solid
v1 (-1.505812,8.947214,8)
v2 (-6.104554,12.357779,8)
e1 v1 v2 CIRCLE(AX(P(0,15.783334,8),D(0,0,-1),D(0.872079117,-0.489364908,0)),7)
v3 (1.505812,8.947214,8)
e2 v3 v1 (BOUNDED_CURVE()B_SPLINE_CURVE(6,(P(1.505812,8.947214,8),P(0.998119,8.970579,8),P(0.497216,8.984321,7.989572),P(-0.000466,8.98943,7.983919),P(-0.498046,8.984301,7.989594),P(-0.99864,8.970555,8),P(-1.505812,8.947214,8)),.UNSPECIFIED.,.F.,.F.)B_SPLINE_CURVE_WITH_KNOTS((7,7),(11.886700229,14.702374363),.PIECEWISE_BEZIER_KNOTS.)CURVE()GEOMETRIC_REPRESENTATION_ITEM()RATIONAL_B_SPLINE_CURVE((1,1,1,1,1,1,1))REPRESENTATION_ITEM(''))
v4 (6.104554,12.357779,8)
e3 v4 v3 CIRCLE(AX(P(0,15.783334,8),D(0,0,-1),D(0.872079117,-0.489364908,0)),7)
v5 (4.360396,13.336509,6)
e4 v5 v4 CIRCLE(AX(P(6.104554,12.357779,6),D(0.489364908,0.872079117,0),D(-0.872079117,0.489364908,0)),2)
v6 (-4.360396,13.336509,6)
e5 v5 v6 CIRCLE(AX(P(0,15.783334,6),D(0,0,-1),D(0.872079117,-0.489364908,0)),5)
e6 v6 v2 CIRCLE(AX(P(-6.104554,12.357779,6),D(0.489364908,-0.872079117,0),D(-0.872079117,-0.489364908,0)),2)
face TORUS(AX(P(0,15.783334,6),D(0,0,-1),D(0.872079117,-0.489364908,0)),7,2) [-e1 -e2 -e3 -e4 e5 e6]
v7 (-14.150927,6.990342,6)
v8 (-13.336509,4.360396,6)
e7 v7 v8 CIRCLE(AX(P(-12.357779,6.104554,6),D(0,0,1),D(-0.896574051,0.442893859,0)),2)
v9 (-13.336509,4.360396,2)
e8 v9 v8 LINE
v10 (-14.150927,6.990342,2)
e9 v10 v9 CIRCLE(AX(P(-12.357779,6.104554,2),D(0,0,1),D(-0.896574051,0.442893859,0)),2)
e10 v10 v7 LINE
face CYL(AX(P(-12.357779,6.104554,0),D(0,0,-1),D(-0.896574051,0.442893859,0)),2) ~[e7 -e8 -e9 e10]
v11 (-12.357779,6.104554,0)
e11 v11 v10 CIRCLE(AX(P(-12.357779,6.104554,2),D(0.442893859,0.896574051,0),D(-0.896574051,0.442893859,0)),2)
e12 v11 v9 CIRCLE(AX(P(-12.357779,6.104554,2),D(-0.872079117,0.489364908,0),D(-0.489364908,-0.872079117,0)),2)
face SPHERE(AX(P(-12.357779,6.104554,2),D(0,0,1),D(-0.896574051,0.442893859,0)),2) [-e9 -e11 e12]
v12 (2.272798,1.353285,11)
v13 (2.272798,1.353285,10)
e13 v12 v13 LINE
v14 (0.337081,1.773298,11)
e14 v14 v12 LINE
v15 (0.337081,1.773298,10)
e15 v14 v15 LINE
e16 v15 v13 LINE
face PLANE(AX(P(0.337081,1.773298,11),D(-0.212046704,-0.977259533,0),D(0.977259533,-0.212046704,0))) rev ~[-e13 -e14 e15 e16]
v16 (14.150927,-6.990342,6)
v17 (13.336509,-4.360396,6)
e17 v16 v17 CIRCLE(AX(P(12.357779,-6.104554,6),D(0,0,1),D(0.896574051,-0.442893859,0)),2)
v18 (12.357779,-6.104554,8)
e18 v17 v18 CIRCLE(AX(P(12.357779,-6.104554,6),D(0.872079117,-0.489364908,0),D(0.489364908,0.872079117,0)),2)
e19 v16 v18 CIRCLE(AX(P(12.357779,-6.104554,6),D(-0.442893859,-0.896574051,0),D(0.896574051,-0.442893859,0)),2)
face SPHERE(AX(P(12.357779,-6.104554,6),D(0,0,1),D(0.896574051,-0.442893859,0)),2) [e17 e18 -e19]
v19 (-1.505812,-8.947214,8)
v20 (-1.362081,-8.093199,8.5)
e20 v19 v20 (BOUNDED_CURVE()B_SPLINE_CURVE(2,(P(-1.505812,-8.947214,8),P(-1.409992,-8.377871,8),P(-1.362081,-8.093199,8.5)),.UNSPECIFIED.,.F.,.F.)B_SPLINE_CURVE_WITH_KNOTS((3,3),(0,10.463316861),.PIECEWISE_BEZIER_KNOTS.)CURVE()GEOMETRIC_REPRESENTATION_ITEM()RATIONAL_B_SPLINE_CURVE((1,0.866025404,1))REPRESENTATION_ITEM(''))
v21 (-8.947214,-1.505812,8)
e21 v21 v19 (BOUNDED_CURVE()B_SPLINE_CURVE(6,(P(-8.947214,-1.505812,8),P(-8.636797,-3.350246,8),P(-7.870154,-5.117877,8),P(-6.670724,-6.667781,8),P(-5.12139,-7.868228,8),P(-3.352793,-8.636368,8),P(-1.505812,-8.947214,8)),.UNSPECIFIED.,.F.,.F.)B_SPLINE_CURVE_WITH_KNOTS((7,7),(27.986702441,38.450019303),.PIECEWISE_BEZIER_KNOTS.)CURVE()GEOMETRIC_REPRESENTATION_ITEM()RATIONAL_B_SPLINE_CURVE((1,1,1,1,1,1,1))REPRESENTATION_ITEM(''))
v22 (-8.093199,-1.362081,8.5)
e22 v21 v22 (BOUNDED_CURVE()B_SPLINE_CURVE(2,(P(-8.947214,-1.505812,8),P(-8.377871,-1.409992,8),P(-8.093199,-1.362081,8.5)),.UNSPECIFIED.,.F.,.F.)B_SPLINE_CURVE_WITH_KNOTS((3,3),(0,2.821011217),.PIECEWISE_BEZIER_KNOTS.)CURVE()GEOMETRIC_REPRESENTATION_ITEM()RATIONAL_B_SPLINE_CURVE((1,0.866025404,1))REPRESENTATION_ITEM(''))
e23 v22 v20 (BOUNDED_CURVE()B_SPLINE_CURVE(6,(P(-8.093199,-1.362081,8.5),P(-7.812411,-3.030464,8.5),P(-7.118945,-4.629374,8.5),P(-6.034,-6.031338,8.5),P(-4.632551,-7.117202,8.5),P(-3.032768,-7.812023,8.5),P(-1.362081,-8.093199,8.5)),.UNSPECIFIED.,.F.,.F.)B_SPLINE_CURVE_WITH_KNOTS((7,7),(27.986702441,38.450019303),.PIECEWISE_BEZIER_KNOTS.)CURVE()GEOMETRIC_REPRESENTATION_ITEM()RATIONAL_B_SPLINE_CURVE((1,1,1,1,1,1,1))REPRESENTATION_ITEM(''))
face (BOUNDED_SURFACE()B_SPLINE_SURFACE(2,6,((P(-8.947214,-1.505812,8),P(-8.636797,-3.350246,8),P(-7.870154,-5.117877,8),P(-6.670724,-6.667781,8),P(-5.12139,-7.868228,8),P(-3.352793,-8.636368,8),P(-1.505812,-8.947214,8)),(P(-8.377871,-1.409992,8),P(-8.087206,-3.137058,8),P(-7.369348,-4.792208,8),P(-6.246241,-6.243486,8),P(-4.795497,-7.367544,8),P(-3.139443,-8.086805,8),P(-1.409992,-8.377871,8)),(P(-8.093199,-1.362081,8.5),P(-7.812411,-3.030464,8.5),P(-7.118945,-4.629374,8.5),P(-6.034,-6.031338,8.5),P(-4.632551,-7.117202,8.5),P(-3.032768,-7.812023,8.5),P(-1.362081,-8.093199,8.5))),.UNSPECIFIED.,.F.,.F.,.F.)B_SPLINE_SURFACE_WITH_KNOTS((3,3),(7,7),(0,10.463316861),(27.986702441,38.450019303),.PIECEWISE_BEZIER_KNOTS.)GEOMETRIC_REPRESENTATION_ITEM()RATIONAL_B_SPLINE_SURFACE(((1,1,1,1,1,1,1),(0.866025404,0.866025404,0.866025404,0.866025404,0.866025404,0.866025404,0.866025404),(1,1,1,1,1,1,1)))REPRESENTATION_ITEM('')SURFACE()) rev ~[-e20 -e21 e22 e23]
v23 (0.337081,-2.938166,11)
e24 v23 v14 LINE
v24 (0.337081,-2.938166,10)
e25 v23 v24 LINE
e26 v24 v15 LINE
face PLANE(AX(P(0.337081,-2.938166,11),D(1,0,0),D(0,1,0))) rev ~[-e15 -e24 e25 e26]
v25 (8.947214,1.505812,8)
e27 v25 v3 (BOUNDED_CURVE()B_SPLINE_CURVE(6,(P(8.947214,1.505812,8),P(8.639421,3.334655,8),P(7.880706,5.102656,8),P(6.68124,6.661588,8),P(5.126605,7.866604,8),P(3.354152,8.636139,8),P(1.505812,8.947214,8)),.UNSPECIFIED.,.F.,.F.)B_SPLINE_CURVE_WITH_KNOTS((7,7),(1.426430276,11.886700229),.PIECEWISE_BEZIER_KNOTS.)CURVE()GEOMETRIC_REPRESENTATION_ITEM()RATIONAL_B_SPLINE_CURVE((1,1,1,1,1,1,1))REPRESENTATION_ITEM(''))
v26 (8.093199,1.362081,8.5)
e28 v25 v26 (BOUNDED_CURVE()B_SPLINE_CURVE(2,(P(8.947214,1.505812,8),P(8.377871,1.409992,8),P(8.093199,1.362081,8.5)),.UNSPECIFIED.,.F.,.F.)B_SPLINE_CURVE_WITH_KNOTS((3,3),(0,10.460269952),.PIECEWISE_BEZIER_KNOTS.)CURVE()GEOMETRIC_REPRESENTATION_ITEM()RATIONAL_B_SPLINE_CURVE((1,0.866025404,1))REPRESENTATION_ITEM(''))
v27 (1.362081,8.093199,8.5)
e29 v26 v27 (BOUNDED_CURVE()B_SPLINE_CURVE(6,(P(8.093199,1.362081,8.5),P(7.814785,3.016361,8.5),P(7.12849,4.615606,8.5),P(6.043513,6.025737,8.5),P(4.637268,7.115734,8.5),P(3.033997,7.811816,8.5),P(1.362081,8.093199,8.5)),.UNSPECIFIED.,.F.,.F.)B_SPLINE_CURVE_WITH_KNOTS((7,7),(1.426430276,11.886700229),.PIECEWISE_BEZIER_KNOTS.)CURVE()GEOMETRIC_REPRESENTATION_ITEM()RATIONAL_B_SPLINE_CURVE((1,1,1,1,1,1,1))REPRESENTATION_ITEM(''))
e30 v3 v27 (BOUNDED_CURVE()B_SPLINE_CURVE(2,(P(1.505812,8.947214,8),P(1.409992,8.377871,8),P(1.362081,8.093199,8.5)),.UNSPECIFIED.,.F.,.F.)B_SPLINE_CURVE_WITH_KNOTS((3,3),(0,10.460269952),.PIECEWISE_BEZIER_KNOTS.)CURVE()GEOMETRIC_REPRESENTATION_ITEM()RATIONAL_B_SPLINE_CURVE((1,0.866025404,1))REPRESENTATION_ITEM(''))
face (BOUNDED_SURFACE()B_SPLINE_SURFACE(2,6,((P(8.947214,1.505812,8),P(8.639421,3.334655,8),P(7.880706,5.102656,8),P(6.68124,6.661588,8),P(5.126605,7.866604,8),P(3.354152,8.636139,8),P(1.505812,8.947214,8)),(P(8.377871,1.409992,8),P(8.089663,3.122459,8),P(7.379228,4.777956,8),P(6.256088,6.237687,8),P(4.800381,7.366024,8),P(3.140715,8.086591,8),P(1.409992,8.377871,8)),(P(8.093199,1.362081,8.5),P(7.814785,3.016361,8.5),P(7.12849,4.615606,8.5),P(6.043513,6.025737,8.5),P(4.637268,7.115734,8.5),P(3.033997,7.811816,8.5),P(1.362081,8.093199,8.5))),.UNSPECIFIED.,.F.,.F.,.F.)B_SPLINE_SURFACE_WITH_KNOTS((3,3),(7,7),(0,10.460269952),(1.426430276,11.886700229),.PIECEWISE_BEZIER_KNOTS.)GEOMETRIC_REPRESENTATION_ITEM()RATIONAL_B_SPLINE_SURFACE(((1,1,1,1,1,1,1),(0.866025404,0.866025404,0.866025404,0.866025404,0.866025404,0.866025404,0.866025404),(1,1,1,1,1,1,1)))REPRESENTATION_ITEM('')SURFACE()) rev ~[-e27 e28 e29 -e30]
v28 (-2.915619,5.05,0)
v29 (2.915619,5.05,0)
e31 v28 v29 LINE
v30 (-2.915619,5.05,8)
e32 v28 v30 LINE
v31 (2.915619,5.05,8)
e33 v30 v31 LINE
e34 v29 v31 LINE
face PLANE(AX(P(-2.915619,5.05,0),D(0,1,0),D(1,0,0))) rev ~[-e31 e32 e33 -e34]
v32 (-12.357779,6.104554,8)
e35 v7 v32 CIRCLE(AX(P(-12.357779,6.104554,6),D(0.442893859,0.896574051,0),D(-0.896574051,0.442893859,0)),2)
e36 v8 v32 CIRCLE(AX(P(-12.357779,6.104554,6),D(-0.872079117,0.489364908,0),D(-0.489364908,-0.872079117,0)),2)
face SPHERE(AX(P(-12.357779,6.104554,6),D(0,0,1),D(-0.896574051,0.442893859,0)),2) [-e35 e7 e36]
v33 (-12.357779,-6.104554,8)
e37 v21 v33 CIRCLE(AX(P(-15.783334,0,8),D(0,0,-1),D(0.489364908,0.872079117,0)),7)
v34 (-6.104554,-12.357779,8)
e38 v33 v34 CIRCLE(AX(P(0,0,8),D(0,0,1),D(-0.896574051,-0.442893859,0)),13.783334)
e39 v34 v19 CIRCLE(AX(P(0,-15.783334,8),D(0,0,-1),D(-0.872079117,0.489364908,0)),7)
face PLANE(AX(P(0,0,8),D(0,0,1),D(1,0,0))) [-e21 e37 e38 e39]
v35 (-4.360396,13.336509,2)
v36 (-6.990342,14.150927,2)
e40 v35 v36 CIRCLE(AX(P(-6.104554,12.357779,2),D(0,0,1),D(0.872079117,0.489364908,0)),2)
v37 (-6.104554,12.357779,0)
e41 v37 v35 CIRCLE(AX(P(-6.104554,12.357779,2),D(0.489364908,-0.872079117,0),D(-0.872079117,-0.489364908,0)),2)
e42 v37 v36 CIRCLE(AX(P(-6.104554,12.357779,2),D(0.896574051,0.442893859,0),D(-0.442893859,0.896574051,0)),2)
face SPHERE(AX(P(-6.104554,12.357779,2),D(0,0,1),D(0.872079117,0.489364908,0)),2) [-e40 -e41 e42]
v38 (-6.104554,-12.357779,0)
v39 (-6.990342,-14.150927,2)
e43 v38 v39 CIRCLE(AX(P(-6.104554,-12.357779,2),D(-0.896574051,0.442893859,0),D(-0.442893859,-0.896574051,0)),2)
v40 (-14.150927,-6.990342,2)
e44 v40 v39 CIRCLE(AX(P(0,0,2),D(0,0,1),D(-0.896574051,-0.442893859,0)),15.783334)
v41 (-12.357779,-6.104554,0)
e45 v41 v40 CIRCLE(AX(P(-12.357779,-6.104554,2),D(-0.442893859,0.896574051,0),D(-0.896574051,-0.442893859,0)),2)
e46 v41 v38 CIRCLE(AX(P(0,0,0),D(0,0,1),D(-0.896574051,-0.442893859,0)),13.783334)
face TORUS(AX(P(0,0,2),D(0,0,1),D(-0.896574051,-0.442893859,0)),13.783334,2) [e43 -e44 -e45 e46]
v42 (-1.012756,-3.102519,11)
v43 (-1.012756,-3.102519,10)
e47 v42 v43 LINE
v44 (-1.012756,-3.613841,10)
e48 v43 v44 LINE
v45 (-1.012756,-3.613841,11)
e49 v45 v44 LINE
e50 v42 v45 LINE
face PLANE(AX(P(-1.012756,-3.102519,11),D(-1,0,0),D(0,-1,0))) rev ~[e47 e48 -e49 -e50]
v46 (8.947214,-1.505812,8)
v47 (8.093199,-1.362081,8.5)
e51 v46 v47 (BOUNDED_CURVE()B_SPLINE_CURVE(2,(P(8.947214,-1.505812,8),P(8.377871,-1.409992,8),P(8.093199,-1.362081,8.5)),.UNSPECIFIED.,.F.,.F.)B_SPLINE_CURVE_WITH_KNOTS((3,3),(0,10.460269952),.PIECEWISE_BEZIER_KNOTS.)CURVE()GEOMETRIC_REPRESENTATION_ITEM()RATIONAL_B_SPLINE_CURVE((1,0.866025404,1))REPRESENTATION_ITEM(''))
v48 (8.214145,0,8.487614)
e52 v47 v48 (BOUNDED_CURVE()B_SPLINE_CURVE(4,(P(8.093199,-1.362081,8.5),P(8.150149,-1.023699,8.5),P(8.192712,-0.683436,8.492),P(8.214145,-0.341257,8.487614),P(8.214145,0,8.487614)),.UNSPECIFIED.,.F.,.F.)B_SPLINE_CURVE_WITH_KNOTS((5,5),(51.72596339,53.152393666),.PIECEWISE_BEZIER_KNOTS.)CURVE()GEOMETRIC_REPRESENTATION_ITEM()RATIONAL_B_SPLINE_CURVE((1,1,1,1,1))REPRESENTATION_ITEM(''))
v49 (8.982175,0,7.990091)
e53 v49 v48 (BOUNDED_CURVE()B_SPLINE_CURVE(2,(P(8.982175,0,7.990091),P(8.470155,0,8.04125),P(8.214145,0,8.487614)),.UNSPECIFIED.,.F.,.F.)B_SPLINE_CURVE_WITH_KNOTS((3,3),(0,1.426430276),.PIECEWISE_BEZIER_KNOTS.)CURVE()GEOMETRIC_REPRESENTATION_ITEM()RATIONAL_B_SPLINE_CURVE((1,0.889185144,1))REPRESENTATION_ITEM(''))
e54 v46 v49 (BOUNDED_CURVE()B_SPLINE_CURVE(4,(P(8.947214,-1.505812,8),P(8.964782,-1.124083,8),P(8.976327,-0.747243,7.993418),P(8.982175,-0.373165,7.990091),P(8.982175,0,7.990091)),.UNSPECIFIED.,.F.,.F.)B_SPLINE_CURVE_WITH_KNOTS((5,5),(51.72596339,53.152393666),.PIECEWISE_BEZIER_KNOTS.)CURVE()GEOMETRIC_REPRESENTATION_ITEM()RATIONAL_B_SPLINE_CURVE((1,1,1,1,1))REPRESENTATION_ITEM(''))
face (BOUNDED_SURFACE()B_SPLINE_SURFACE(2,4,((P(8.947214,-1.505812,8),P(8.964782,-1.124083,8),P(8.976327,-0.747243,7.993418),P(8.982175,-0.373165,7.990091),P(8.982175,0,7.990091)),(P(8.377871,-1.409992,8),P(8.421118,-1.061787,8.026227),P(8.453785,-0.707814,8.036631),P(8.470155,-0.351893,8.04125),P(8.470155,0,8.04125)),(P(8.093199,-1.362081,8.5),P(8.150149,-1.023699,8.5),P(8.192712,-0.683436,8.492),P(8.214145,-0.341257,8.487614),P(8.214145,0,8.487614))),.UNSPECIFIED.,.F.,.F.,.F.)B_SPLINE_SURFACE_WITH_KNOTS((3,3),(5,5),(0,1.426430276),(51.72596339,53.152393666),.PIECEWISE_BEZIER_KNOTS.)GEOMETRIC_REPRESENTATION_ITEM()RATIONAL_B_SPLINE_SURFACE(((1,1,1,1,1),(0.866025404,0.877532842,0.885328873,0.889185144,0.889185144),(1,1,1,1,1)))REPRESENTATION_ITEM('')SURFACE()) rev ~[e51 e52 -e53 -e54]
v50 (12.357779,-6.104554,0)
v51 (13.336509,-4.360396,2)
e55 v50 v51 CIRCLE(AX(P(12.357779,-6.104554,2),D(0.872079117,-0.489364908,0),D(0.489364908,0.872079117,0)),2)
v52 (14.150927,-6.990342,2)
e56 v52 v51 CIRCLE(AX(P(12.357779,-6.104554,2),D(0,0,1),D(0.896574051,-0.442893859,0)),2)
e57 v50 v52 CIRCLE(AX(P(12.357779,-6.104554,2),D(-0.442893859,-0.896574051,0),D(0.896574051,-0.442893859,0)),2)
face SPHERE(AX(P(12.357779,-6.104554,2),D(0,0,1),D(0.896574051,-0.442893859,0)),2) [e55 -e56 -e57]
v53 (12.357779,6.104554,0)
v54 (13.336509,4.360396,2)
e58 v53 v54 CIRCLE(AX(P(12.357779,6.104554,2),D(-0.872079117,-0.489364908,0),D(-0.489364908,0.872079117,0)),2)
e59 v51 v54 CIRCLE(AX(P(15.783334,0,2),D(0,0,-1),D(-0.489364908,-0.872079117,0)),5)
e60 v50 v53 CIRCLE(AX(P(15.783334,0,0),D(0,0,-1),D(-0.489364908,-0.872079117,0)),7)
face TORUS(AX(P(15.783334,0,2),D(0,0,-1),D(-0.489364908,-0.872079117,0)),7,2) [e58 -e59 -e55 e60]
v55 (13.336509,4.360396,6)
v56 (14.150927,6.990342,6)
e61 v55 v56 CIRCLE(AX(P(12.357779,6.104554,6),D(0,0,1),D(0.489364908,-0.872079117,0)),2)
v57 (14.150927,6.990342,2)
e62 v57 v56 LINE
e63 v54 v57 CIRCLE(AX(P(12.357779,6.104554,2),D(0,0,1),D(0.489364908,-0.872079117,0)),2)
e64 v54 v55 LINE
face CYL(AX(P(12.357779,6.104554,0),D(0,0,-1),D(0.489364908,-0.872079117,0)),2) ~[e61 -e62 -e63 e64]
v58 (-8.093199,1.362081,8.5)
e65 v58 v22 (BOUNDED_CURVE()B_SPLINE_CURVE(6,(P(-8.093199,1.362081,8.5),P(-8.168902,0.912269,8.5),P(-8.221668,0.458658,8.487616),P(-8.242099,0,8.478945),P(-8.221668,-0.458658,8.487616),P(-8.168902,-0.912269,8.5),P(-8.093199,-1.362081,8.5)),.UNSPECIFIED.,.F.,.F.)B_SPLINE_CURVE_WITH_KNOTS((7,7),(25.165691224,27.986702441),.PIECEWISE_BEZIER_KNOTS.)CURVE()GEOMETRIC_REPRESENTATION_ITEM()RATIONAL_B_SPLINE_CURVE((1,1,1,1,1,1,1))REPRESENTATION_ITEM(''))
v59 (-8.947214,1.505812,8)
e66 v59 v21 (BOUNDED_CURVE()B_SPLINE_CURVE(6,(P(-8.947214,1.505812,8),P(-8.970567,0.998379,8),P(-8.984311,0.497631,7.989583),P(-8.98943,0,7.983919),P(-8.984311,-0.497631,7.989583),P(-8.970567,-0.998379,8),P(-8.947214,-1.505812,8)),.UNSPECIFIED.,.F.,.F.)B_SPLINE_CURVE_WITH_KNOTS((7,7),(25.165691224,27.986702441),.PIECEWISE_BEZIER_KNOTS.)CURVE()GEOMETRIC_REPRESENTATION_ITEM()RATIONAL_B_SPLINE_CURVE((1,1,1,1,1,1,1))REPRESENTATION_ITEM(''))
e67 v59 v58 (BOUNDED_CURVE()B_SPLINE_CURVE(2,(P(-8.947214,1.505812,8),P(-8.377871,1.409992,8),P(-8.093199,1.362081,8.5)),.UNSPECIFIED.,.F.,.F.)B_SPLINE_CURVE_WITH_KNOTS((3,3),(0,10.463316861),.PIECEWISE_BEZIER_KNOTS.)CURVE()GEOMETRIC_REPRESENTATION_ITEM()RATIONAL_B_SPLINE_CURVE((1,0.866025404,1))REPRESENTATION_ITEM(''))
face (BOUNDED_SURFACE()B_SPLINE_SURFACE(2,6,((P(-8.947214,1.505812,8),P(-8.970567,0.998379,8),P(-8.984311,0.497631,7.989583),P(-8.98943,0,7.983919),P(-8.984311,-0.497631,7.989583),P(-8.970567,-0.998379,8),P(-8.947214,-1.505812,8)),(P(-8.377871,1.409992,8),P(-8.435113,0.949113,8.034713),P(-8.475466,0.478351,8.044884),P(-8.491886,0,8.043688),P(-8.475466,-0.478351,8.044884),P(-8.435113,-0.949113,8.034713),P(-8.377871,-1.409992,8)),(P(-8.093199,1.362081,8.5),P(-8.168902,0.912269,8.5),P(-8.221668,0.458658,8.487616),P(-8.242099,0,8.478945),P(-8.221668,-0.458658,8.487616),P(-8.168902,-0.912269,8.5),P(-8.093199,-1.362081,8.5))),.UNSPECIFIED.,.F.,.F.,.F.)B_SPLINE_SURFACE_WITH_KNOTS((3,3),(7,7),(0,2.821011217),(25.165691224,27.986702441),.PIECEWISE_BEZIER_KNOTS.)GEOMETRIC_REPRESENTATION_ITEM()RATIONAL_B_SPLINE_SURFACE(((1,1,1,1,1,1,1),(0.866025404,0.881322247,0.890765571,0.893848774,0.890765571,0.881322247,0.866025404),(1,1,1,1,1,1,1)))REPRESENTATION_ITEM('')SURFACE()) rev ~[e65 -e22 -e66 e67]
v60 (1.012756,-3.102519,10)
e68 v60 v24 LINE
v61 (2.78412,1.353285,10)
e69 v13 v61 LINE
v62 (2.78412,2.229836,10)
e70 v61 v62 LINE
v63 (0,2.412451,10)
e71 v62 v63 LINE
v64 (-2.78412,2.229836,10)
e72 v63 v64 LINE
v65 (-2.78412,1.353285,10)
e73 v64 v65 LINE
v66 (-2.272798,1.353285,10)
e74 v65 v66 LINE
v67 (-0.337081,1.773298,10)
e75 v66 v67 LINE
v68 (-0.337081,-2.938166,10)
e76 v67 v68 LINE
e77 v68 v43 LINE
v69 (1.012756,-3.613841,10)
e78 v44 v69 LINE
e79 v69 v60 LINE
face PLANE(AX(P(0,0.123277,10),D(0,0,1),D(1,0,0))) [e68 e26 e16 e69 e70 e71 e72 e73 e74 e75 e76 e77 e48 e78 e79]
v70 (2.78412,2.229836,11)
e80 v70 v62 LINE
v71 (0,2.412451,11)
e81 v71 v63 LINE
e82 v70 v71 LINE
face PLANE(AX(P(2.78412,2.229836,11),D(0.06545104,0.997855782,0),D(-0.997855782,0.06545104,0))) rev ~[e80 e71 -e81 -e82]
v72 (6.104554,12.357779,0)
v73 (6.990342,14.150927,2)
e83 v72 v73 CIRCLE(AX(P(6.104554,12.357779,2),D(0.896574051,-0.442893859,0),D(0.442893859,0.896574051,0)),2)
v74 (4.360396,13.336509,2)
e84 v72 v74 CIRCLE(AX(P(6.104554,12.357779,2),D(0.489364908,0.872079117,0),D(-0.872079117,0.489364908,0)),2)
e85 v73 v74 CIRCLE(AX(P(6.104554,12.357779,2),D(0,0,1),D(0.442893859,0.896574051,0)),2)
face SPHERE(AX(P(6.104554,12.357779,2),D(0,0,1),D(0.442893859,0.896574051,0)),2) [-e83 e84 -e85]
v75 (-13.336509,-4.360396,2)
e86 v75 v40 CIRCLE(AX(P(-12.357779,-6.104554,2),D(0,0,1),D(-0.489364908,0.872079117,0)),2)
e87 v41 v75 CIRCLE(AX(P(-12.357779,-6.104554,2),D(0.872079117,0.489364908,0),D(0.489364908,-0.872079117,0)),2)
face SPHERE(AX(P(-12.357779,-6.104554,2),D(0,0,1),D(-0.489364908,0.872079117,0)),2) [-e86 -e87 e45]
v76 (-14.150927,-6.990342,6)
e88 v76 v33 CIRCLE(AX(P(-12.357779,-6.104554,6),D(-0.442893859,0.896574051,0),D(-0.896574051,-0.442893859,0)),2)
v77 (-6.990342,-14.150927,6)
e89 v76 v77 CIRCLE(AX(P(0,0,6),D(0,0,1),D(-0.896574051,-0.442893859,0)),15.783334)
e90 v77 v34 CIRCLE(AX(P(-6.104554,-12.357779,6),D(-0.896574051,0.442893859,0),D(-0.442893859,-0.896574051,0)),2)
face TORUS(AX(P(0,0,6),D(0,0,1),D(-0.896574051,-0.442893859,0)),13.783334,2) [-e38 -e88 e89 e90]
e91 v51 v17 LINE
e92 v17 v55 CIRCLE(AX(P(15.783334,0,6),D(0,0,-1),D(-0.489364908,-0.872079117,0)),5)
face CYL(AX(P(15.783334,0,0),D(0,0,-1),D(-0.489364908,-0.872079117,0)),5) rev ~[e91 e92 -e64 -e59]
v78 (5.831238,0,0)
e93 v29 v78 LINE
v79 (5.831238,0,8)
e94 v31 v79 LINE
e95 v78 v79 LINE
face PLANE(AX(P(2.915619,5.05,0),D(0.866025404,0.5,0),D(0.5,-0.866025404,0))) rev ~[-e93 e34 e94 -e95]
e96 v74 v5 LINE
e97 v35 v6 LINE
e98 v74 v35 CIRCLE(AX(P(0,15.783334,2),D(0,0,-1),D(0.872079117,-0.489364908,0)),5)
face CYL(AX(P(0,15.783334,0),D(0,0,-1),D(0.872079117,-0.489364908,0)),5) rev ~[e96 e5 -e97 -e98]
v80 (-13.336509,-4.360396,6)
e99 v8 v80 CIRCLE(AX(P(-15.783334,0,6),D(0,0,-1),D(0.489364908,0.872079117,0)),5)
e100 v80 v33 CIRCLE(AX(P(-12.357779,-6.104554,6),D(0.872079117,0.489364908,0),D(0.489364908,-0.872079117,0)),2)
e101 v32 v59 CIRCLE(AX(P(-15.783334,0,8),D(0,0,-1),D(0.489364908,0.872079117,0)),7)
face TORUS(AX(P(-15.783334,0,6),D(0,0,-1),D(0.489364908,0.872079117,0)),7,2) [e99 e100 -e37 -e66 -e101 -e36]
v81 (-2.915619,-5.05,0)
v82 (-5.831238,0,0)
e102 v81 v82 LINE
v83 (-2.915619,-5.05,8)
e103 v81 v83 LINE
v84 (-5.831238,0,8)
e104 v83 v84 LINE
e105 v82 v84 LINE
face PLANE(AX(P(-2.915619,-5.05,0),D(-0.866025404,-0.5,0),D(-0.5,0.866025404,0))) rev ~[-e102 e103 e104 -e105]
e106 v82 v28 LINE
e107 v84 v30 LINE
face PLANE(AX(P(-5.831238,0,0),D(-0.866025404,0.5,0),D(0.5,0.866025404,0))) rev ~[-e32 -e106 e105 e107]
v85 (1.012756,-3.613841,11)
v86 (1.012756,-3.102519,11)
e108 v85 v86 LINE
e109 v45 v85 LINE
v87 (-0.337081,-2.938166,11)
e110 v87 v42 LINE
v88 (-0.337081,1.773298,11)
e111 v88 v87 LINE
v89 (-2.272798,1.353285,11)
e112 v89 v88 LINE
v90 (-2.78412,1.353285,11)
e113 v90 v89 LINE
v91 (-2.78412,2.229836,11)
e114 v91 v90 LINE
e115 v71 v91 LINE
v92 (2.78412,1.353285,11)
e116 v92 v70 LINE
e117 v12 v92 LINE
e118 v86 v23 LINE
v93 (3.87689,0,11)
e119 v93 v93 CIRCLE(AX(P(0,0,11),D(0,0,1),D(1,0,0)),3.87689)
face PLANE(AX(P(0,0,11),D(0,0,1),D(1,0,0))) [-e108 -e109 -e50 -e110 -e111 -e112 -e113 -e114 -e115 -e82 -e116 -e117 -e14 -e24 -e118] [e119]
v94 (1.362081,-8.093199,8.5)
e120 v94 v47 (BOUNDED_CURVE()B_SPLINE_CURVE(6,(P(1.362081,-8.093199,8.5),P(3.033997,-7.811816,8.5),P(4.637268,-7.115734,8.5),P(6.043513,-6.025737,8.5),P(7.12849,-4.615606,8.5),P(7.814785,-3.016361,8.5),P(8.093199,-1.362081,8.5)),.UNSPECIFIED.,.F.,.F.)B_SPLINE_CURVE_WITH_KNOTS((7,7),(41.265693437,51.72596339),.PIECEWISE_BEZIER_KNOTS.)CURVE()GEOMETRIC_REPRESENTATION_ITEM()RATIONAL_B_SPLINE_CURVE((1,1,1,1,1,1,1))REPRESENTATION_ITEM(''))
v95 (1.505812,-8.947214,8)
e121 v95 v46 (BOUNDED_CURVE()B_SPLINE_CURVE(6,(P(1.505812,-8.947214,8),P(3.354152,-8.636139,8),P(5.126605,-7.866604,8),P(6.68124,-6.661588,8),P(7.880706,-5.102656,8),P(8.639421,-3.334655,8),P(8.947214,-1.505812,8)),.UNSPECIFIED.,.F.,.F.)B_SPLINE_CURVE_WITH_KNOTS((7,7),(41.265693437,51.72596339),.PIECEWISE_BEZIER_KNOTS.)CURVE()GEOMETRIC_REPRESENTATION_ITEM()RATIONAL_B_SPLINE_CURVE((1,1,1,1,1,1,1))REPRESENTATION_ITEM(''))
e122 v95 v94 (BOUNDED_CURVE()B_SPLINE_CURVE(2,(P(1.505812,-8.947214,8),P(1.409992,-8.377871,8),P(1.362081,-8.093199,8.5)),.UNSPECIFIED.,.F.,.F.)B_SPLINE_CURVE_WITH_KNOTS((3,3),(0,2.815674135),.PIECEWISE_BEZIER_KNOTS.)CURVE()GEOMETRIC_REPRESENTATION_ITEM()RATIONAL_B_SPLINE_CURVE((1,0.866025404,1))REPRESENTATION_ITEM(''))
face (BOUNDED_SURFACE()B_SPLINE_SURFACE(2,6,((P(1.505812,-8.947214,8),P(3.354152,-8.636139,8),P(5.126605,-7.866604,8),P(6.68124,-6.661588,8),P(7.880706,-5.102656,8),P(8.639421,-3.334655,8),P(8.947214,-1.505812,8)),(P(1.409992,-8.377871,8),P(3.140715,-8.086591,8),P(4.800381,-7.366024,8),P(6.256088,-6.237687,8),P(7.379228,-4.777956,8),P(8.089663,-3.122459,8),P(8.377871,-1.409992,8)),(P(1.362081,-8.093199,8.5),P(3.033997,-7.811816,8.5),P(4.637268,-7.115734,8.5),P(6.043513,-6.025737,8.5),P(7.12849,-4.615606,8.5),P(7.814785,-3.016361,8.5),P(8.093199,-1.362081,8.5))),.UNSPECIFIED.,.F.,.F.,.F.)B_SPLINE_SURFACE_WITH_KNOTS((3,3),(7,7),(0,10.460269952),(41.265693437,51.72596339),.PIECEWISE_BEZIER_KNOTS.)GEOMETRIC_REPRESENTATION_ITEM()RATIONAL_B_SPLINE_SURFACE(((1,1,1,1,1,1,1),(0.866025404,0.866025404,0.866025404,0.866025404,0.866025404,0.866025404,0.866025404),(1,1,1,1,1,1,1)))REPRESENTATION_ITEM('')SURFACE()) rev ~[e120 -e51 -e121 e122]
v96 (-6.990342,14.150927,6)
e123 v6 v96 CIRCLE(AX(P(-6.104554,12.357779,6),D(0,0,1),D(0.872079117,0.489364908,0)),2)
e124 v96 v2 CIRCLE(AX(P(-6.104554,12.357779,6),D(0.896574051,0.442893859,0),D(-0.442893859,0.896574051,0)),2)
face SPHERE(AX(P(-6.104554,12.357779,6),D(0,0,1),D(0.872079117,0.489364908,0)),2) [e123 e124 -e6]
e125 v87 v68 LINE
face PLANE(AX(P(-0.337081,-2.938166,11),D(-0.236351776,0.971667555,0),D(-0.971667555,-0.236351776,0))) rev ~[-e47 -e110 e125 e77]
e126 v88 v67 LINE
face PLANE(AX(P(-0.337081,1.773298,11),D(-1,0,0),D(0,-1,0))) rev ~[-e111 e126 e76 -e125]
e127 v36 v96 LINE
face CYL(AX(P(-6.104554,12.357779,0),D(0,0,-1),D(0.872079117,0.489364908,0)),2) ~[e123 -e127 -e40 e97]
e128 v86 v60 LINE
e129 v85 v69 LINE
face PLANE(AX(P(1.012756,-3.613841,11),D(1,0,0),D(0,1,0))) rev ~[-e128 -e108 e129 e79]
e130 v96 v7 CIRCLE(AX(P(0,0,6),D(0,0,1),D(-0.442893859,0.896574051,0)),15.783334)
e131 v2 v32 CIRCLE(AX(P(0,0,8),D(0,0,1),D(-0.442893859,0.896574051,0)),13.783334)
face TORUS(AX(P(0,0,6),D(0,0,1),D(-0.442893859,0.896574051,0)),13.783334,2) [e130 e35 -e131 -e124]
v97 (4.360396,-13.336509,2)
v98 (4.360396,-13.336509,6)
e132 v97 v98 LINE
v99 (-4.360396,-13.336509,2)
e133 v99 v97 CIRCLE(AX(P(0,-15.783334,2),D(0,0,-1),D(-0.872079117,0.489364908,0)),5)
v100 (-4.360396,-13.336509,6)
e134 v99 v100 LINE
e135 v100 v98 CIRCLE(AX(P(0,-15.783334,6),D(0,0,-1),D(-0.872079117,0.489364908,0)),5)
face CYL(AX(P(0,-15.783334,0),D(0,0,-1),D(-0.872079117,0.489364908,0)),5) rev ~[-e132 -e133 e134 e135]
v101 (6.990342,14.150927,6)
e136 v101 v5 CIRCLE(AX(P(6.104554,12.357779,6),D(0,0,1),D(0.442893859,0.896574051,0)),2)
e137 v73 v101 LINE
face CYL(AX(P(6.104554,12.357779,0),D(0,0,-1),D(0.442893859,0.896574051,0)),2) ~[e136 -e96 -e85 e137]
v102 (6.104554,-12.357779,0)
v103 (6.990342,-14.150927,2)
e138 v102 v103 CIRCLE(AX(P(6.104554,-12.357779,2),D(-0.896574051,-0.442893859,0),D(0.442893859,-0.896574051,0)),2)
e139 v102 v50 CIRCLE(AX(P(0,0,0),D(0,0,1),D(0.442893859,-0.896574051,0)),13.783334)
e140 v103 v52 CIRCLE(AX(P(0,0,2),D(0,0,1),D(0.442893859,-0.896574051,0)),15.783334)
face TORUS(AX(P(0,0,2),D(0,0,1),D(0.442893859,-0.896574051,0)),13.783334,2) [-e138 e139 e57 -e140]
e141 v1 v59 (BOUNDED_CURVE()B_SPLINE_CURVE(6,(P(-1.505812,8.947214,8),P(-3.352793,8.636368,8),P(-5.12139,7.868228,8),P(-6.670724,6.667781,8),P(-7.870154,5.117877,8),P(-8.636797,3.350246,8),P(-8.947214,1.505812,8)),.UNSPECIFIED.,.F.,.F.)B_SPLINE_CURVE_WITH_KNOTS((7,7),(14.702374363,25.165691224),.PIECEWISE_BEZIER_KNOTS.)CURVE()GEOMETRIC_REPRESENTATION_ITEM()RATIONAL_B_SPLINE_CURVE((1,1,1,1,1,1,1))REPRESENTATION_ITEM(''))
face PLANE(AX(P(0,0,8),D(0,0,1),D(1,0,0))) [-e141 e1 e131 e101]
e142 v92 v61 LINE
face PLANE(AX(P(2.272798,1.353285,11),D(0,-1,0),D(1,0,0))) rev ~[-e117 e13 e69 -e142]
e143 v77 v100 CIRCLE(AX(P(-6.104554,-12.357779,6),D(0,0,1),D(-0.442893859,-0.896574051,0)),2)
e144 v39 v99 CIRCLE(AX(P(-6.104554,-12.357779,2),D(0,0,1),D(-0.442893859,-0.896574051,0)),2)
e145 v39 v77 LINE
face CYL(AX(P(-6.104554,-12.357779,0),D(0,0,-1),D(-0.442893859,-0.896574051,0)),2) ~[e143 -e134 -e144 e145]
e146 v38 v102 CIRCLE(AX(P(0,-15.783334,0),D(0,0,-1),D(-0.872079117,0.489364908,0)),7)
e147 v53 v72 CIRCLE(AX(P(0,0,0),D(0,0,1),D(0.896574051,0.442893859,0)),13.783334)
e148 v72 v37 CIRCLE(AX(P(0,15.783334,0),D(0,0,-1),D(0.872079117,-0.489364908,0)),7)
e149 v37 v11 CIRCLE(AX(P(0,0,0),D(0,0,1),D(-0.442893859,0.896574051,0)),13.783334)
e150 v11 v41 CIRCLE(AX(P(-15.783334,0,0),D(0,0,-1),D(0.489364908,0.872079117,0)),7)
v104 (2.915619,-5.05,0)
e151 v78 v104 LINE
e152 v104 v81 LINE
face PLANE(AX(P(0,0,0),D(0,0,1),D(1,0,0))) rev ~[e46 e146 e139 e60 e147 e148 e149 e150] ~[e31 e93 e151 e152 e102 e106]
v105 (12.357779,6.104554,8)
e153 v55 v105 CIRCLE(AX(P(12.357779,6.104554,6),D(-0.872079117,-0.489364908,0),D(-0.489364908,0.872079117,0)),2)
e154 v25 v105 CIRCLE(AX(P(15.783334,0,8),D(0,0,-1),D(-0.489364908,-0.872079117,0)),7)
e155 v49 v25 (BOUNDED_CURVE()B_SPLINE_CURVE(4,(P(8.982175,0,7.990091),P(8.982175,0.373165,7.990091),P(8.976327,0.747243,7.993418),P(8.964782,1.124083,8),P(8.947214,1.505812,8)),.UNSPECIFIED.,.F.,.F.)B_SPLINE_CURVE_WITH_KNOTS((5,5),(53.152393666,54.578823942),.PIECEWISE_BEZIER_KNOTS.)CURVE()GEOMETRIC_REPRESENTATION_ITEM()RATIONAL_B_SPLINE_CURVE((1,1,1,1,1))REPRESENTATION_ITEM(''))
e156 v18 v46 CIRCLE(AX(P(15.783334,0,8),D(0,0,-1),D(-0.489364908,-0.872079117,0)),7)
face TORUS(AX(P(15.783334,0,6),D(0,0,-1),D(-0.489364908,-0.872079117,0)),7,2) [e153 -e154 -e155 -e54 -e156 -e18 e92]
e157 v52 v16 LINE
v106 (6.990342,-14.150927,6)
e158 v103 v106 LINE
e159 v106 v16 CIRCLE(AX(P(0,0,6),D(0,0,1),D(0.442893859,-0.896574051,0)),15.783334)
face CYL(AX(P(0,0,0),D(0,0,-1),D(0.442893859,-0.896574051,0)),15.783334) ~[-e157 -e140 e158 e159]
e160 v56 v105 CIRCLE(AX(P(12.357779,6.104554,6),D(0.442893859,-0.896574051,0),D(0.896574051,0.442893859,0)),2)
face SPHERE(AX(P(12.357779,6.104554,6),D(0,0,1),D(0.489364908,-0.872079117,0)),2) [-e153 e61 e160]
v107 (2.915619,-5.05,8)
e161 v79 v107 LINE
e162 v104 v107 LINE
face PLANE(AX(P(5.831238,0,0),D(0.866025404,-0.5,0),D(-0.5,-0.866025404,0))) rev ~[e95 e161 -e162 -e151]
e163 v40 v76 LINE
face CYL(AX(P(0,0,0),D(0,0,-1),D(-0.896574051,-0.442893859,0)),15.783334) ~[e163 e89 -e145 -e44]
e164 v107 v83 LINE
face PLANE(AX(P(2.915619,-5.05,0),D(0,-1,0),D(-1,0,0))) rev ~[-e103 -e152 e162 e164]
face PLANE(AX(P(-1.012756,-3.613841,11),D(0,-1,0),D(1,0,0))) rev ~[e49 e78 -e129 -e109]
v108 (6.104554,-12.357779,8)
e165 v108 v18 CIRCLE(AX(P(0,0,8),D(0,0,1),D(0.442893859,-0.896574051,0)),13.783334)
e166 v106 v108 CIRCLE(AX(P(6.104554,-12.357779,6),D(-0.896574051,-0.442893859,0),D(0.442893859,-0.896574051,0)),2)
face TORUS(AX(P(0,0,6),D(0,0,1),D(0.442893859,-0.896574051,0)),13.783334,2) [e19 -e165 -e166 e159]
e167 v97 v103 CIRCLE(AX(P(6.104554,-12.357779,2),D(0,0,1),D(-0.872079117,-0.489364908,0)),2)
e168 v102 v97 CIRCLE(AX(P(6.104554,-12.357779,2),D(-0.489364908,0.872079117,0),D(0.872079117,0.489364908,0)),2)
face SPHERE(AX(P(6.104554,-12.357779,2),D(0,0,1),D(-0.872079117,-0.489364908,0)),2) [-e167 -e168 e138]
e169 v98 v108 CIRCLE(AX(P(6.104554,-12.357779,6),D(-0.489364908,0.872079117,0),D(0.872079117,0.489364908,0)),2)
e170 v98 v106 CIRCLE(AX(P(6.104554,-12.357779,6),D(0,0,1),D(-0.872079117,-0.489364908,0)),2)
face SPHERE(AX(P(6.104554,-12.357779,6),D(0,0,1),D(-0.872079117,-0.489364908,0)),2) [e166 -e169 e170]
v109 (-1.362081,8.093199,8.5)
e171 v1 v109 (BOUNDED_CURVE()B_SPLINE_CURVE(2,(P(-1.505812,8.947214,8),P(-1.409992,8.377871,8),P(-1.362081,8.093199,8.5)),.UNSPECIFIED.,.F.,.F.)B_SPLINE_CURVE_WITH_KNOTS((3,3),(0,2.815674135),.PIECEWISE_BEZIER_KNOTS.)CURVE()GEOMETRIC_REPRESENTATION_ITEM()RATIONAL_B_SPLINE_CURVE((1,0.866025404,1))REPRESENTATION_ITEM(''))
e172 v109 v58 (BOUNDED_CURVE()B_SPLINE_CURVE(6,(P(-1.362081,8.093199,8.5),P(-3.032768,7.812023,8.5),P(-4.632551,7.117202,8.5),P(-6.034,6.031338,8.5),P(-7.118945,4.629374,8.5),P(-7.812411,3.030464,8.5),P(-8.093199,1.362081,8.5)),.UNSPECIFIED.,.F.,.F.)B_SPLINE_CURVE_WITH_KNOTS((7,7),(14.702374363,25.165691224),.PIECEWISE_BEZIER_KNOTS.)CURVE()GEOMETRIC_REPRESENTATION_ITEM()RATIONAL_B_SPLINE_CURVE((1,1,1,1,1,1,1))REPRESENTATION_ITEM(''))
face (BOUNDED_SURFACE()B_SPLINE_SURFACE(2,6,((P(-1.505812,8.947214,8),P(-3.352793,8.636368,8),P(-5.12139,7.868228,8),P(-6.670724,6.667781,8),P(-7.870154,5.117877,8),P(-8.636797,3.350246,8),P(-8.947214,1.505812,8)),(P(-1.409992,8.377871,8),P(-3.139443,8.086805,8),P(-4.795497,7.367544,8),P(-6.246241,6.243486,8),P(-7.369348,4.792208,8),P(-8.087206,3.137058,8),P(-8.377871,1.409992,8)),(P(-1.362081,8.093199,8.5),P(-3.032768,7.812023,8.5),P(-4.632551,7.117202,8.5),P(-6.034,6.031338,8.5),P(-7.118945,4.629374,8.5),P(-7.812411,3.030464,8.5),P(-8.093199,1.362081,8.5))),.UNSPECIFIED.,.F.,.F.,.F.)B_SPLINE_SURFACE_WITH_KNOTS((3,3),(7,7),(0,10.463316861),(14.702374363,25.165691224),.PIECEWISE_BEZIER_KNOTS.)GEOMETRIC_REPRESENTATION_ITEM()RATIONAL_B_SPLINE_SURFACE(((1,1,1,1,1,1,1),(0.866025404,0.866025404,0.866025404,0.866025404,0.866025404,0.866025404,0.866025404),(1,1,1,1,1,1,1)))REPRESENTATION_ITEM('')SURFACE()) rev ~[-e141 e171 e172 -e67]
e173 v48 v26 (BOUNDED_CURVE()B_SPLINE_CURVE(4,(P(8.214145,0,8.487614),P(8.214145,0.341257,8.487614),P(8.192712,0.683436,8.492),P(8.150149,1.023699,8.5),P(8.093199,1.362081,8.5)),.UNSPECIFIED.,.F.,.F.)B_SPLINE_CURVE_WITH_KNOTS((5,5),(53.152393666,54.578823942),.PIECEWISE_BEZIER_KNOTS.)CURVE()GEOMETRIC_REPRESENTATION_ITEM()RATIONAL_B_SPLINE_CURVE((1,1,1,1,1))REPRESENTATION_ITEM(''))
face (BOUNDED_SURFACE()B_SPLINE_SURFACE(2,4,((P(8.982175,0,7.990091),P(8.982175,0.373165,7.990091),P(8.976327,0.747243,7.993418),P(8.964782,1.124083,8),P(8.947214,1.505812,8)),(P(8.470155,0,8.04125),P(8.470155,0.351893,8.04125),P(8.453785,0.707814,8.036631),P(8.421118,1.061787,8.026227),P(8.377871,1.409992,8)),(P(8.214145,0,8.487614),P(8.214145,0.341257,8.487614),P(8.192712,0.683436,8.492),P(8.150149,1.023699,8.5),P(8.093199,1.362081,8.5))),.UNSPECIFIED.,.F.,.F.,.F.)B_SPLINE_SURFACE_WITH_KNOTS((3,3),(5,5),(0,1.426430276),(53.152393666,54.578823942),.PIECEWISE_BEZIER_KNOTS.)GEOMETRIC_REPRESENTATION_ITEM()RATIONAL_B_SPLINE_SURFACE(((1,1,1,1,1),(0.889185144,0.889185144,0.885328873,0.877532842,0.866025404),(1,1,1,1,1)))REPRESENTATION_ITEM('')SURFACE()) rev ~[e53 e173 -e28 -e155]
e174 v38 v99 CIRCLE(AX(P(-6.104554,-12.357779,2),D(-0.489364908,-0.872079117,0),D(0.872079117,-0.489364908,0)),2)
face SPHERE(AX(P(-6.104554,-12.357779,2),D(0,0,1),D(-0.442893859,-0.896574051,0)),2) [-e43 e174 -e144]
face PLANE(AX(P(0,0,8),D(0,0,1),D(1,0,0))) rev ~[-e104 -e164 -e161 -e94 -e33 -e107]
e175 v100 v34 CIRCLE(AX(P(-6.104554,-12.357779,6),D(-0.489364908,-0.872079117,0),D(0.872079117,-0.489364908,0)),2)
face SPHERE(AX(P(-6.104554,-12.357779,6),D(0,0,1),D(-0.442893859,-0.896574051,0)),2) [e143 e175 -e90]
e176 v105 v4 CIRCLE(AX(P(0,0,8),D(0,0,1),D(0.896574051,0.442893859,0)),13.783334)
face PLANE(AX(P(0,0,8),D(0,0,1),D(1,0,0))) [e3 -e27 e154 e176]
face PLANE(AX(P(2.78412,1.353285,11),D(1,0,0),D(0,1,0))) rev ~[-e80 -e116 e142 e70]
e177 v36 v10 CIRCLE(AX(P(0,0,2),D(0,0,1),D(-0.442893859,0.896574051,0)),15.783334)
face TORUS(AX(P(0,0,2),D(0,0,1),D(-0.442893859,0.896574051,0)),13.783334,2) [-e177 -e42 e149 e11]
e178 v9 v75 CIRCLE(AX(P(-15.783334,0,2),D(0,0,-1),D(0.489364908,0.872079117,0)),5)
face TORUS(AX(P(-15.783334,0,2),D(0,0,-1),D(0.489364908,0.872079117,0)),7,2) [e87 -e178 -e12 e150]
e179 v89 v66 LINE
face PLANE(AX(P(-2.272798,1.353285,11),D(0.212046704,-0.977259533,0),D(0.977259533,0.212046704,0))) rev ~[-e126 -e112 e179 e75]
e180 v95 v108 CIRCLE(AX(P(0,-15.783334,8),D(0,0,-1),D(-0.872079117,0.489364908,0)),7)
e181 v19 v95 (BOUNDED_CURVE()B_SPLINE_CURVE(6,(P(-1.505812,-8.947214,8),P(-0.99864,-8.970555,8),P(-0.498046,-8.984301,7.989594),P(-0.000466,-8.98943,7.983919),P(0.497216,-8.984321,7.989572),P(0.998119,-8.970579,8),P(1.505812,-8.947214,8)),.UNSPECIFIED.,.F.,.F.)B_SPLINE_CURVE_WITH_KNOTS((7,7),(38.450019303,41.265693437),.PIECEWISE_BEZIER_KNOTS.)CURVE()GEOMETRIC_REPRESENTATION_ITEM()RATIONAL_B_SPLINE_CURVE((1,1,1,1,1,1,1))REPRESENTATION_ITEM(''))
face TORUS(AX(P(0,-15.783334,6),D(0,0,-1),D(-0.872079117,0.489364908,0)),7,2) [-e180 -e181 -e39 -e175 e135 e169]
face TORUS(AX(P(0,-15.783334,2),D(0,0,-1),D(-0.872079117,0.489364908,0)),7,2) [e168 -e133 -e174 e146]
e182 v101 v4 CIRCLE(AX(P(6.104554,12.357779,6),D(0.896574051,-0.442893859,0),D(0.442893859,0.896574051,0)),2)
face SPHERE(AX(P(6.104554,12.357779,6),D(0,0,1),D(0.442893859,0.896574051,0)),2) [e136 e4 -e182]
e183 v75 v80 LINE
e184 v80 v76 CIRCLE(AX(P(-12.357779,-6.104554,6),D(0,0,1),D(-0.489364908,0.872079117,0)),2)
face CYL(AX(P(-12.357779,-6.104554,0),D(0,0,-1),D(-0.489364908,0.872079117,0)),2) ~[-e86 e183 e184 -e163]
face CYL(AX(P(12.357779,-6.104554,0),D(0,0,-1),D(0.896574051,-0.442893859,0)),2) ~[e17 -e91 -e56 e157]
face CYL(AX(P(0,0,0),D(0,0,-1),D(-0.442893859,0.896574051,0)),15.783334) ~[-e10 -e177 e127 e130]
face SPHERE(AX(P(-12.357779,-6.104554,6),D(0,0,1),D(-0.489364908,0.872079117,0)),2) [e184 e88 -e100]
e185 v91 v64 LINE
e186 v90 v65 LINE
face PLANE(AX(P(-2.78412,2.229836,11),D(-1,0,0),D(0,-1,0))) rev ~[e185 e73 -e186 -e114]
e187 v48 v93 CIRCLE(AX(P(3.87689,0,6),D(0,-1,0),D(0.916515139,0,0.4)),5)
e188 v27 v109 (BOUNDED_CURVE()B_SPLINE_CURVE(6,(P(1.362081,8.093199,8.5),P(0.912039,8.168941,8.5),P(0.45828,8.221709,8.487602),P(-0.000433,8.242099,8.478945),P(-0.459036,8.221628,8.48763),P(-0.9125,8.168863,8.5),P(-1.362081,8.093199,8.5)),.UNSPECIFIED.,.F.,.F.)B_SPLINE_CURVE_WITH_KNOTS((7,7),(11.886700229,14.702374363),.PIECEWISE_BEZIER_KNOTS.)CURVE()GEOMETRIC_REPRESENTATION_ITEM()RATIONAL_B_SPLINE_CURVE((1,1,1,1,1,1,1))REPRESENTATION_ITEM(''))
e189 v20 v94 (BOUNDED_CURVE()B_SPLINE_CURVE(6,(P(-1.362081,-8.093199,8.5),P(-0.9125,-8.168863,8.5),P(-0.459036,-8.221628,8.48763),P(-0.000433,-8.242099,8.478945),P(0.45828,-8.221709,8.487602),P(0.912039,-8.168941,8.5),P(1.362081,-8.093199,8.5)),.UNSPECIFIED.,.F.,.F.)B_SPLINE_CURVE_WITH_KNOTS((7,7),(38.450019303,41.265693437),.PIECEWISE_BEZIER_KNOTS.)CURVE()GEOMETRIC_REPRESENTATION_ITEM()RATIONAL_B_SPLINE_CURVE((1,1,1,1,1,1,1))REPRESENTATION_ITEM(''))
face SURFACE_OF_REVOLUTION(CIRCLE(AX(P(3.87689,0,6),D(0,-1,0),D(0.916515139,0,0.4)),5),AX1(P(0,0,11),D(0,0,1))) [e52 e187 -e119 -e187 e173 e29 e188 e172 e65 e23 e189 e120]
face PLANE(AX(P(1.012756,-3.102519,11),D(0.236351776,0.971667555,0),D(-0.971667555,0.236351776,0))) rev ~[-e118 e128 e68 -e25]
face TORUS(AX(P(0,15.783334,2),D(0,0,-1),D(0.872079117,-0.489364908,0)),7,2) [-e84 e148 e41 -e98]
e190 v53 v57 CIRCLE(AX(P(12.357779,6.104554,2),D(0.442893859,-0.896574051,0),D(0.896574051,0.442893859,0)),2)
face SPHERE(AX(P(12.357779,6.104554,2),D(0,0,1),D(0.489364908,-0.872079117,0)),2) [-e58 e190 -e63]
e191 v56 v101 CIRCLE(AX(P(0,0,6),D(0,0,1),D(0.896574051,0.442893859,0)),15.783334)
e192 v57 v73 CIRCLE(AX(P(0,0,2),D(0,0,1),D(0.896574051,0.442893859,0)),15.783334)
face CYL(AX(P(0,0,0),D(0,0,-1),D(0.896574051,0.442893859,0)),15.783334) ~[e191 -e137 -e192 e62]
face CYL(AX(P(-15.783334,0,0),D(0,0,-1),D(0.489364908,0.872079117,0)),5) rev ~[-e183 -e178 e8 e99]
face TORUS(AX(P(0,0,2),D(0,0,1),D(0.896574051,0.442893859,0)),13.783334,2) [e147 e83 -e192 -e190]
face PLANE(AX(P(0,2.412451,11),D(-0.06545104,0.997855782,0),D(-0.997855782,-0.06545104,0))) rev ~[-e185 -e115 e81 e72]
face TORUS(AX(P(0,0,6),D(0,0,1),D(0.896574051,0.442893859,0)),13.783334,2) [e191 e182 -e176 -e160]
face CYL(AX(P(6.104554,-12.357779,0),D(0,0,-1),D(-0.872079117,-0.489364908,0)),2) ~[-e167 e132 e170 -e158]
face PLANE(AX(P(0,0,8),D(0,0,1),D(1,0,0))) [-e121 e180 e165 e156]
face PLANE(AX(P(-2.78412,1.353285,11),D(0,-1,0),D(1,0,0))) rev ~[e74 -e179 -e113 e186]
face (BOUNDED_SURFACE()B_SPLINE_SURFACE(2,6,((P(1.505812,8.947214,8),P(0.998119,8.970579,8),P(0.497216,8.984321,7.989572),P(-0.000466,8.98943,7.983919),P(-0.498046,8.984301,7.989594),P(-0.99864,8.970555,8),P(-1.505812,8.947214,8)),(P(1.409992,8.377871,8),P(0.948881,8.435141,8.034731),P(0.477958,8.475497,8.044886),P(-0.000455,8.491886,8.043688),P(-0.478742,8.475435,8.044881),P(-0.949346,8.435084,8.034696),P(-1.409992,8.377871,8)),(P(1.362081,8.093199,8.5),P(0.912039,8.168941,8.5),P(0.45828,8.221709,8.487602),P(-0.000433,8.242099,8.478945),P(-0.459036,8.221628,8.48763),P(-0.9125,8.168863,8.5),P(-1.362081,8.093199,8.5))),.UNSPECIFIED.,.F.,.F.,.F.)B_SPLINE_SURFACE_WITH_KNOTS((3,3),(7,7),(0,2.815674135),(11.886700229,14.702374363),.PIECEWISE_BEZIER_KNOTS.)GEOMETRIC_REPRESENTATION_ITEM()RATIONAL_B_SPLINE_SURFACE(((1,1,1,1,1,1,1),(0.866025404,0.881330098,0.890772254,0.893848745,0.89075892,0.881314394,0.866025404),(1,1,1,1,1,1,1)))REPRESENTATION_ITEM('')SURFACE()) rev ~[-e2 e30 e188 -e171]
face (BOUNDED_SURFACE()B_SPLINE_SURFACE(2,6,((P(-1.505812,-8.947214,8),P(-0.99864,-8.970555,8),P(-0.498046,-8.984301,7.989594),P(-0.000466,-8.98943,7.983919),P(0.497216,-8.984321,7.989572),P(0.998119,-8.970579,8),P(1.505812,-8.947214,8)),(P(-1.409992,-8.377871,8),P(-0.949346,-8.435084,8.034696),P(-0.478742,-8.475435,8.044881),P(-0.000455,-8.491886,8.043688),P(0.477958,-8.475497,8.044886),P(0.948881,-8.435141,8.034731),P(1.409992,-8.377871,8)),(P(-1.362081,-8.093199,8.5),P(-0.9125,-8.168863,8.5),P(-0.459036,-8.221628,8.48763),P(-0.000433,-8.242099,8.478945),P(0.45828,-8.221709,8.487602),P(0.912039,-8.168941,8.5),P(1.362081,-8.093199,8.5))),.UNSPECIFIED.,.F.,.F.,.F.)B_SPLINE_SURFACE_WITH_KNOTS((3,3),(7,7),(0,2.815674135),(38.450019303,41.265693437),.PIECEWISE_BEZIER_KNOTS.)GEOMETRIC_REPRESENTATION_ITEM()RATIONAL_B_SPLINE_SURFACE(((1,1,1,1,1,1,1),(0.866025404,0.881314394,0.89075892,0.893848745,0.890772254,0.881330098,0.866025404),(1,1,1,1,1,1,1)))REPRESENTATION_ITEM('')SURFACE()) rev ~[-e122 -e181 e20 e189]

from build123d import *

# Parameters (mm, degrees)
F1_DEPTH = 8
F2_R     = 2
F3_R     = 2
F4_R     = 8.4594661891
F5_DEPTH = 3
F7_R     = 1
F9_DEPTH = 1


# Not quite as in the source:
# - a fillet or chamfer that OpenCascade refuses, or shapes differently, is made with other operations: its cross-section is extruded or revolved along the edge and cut away or added


with BuildPart() as f1:
    # F0 (on Top) → F1 (new body)
    with BuildSketch(Plane.XY):
        with BuildLine():
            ThreePointArc((-4.3603955862, 13.336509077), (-5.5129295549, 14.2682715346), (-6.9903415394, 14.1509273633))
            ThreePointArc((-6.9903415394, 14.1509273633), (-11.1605022306, 11.1605022306), (-14.1509273633, 6.9903415394))
            ThreePointArc((-14.1509273633, 6.9903415394), (-14.2682715346, 5.5129295549), (-13.336509077, 4.3603955862))
            ThreePointArc((-13.336509077, 4.3603955862), (-10.7833336174, 0), (-13.336509077, -4.3603955862))
            ThreePointArc((-13.336509077, -4.3603955862), (-14.2682715346, -5.5129295549), (-14.1509273633, -6.9903415394))
            ThreePointArc((-14.1509273633, -6.9903415394), (-11.1605022306, -11.1605022306), (-6.9903415394, -14.1509273633))
            ThreePointArc((-6.9903415394, -14.1509273633), (-5.5129295549, -14.2682715346), (-4.3603955862, -13.336509077))
            ThreePointArc((-4.3603955862, -13.336509077), (0, -10.7833336174), (4.3603955862, -13.336509077))
            ThreePointArc((4.3603955862, -13.336509077), (5.5129295549, -14.2682715346), (6.9903415394, -14.1509273633))
            ThreePointArc((6.9903415394, -14.1509273633), (11.1605022306, -11.1605022306), (14.1509273633, -6.9903415394))
            ThreePointArc((14.1509273633, -6.9903415394), (14.2682715346, -5.5129295549), (13.336509077, -4.3603955862))
            ThreePointArc((13.336509077, -4.3603955862), (10.7833336174, 0), (13.336509077, 4.3603955862))
            ThreePointArc((13.336509077, 4.3603955862), (14.2682715346, 5.5129295549), (14.1509273633, 6.9903415394))
            ThreePointArc((14.1509273633, 6.9903415394), (11.1605022306, 11.1605022306), (6.9903415394, 14.1509273633))
            ThreePointArc((6.9903415394, 14.1509273633), (5.5129295549, 14.2682715346), (4.3603955862, 13.336509077))
            ThreePointArc((4.3603955862, 13.336509077), (0, 10.7833336174), (-4.3603955862, 13.336509077))
        make_face()
        Polygon((-5.8312377188, 0), (-2.9156188594, 5.05), (2.9156188594, 5.05), (5.8312377188, 0), (2.9156188594, -5.05), (-2.9156188594, -5.05), align=None, mode=Mode.SUBTRACT)
    extrude(amount=F1_DEPTH)

    # F2
    f2_edges = [f1.edges().sort_by_distance(p)[0] for p in [
        (11.160502, 11.160502, 8),
        (0, 10.783334, 8),
        (5.51293, 14.268272, 8),
        (-5.51293, 14.268272, 8),
        (-11.160502, 11.160502, 8),
        (-14.268272, 5.51293, 8),
        (-10.783334, 0, 8),
        (14.268272, 5.51293, 8),
        (10.783334, 0, 8),
        (14.268272, -5.51293, 8),
        (11.160502, -11.160502, 8),
        (-14.268272, -5.51293, 8),
        (-11.160502, -11.160502, 8),
        (0, -10.783334, 8),
        (-5.51293, -14.268272, 8),
        (5.51293, -14.268272, 8),
    ]]
    fillet(f2_edges, radius=F2_R)

    # F3
    f3_edges = [f1.edges().sort_by_distance(p)[0] for p in [
        (11.160502, 11.160502, 0),
        (14.268272, 5.51293, 0),
        (10.783334, 0, 0),
        (14.268272, -5.51293, 0),
        (11.160502, -11.160502, 0),
        (5.51293, -14.268272, 0),
        (0, -10.783334, 0),
        (-5.51293, -14.268272, 0),
        (-11.160502, -11.160502, 0),
        (-14.268272, -5.51293, 0),
        (-10.783334, 0, 0),
        (-14.268272, 5.51293, 0),
        (-11.160502, 11.160502, 0),
        (-5.51293, 14.268272, 0),
        (0, 10.783334, 0),
        (5.51293, 14.268272, 0),
    ]]
    fillet(f3_edges, radius=F3_R)

    # F4 (on face) → F5 (join)
    with BuildSketch(Plane.XY.offset(8)):
        Circle(F4_R)
    extrude(amount=F5_DEPTH)

    # F6: fillet of radius 5 on 1 edges, made by hand

    # F6_s1 → F6_t2 (revolve, cut)
    with BuildSketch(Plane.XZ):
        with BuildLine():
            ThreePointArc((8.4594661891, 8), (6.6155032816, 10.1833001327), (3.8768904941, 11))
            Line((3.8768904941, 11), (8.4594661891, 11))
            Line((8.4594661891, 11), (8.4594661891, 8))
        make_face()
    revolve(axis=Axis((0, 0, 11), (0, 0, 1)), mode=Mode.SUBTRACT)

    # F7
    f7_edges = [f1.edges().sort_by_distance(p)[0] for p in [
        (-8.459466, 0, 8),
    ]]
    fillet(f7_edges, radius=F7_R)

    # F8 (on face) → F9 (cut)
    with BuildSketch(Plane.XY.offset(11)):
        Polygon((-1.0127555579, -3.6138410214), (0, -3.6138410214), (1.0127555579, -3.6138410214), (1.0127555579, -3.1025193166), (0.3370805643, -2.9381657951), (0.3370805643, 1.7732984852), (2.2727984469, 1.3532845769), (2.7841201518, 1.3532845769), (2.7841201518, 2.2298358381), (0, 2.4124509655), (-2.7841201518, 2.2298358381), (-2.7841201518, 1.3532845769), (-2.2727984469, 1.3532845769), (-0.3370805643, 1.7732984852), (-0.3370805643, -2.9381657951), (-1.0127555579, -3.1025193166), align=None)
    extrude(amount=-F9_DEPTH, mode=Mode.SUBTRACT)


solid = f1.part
